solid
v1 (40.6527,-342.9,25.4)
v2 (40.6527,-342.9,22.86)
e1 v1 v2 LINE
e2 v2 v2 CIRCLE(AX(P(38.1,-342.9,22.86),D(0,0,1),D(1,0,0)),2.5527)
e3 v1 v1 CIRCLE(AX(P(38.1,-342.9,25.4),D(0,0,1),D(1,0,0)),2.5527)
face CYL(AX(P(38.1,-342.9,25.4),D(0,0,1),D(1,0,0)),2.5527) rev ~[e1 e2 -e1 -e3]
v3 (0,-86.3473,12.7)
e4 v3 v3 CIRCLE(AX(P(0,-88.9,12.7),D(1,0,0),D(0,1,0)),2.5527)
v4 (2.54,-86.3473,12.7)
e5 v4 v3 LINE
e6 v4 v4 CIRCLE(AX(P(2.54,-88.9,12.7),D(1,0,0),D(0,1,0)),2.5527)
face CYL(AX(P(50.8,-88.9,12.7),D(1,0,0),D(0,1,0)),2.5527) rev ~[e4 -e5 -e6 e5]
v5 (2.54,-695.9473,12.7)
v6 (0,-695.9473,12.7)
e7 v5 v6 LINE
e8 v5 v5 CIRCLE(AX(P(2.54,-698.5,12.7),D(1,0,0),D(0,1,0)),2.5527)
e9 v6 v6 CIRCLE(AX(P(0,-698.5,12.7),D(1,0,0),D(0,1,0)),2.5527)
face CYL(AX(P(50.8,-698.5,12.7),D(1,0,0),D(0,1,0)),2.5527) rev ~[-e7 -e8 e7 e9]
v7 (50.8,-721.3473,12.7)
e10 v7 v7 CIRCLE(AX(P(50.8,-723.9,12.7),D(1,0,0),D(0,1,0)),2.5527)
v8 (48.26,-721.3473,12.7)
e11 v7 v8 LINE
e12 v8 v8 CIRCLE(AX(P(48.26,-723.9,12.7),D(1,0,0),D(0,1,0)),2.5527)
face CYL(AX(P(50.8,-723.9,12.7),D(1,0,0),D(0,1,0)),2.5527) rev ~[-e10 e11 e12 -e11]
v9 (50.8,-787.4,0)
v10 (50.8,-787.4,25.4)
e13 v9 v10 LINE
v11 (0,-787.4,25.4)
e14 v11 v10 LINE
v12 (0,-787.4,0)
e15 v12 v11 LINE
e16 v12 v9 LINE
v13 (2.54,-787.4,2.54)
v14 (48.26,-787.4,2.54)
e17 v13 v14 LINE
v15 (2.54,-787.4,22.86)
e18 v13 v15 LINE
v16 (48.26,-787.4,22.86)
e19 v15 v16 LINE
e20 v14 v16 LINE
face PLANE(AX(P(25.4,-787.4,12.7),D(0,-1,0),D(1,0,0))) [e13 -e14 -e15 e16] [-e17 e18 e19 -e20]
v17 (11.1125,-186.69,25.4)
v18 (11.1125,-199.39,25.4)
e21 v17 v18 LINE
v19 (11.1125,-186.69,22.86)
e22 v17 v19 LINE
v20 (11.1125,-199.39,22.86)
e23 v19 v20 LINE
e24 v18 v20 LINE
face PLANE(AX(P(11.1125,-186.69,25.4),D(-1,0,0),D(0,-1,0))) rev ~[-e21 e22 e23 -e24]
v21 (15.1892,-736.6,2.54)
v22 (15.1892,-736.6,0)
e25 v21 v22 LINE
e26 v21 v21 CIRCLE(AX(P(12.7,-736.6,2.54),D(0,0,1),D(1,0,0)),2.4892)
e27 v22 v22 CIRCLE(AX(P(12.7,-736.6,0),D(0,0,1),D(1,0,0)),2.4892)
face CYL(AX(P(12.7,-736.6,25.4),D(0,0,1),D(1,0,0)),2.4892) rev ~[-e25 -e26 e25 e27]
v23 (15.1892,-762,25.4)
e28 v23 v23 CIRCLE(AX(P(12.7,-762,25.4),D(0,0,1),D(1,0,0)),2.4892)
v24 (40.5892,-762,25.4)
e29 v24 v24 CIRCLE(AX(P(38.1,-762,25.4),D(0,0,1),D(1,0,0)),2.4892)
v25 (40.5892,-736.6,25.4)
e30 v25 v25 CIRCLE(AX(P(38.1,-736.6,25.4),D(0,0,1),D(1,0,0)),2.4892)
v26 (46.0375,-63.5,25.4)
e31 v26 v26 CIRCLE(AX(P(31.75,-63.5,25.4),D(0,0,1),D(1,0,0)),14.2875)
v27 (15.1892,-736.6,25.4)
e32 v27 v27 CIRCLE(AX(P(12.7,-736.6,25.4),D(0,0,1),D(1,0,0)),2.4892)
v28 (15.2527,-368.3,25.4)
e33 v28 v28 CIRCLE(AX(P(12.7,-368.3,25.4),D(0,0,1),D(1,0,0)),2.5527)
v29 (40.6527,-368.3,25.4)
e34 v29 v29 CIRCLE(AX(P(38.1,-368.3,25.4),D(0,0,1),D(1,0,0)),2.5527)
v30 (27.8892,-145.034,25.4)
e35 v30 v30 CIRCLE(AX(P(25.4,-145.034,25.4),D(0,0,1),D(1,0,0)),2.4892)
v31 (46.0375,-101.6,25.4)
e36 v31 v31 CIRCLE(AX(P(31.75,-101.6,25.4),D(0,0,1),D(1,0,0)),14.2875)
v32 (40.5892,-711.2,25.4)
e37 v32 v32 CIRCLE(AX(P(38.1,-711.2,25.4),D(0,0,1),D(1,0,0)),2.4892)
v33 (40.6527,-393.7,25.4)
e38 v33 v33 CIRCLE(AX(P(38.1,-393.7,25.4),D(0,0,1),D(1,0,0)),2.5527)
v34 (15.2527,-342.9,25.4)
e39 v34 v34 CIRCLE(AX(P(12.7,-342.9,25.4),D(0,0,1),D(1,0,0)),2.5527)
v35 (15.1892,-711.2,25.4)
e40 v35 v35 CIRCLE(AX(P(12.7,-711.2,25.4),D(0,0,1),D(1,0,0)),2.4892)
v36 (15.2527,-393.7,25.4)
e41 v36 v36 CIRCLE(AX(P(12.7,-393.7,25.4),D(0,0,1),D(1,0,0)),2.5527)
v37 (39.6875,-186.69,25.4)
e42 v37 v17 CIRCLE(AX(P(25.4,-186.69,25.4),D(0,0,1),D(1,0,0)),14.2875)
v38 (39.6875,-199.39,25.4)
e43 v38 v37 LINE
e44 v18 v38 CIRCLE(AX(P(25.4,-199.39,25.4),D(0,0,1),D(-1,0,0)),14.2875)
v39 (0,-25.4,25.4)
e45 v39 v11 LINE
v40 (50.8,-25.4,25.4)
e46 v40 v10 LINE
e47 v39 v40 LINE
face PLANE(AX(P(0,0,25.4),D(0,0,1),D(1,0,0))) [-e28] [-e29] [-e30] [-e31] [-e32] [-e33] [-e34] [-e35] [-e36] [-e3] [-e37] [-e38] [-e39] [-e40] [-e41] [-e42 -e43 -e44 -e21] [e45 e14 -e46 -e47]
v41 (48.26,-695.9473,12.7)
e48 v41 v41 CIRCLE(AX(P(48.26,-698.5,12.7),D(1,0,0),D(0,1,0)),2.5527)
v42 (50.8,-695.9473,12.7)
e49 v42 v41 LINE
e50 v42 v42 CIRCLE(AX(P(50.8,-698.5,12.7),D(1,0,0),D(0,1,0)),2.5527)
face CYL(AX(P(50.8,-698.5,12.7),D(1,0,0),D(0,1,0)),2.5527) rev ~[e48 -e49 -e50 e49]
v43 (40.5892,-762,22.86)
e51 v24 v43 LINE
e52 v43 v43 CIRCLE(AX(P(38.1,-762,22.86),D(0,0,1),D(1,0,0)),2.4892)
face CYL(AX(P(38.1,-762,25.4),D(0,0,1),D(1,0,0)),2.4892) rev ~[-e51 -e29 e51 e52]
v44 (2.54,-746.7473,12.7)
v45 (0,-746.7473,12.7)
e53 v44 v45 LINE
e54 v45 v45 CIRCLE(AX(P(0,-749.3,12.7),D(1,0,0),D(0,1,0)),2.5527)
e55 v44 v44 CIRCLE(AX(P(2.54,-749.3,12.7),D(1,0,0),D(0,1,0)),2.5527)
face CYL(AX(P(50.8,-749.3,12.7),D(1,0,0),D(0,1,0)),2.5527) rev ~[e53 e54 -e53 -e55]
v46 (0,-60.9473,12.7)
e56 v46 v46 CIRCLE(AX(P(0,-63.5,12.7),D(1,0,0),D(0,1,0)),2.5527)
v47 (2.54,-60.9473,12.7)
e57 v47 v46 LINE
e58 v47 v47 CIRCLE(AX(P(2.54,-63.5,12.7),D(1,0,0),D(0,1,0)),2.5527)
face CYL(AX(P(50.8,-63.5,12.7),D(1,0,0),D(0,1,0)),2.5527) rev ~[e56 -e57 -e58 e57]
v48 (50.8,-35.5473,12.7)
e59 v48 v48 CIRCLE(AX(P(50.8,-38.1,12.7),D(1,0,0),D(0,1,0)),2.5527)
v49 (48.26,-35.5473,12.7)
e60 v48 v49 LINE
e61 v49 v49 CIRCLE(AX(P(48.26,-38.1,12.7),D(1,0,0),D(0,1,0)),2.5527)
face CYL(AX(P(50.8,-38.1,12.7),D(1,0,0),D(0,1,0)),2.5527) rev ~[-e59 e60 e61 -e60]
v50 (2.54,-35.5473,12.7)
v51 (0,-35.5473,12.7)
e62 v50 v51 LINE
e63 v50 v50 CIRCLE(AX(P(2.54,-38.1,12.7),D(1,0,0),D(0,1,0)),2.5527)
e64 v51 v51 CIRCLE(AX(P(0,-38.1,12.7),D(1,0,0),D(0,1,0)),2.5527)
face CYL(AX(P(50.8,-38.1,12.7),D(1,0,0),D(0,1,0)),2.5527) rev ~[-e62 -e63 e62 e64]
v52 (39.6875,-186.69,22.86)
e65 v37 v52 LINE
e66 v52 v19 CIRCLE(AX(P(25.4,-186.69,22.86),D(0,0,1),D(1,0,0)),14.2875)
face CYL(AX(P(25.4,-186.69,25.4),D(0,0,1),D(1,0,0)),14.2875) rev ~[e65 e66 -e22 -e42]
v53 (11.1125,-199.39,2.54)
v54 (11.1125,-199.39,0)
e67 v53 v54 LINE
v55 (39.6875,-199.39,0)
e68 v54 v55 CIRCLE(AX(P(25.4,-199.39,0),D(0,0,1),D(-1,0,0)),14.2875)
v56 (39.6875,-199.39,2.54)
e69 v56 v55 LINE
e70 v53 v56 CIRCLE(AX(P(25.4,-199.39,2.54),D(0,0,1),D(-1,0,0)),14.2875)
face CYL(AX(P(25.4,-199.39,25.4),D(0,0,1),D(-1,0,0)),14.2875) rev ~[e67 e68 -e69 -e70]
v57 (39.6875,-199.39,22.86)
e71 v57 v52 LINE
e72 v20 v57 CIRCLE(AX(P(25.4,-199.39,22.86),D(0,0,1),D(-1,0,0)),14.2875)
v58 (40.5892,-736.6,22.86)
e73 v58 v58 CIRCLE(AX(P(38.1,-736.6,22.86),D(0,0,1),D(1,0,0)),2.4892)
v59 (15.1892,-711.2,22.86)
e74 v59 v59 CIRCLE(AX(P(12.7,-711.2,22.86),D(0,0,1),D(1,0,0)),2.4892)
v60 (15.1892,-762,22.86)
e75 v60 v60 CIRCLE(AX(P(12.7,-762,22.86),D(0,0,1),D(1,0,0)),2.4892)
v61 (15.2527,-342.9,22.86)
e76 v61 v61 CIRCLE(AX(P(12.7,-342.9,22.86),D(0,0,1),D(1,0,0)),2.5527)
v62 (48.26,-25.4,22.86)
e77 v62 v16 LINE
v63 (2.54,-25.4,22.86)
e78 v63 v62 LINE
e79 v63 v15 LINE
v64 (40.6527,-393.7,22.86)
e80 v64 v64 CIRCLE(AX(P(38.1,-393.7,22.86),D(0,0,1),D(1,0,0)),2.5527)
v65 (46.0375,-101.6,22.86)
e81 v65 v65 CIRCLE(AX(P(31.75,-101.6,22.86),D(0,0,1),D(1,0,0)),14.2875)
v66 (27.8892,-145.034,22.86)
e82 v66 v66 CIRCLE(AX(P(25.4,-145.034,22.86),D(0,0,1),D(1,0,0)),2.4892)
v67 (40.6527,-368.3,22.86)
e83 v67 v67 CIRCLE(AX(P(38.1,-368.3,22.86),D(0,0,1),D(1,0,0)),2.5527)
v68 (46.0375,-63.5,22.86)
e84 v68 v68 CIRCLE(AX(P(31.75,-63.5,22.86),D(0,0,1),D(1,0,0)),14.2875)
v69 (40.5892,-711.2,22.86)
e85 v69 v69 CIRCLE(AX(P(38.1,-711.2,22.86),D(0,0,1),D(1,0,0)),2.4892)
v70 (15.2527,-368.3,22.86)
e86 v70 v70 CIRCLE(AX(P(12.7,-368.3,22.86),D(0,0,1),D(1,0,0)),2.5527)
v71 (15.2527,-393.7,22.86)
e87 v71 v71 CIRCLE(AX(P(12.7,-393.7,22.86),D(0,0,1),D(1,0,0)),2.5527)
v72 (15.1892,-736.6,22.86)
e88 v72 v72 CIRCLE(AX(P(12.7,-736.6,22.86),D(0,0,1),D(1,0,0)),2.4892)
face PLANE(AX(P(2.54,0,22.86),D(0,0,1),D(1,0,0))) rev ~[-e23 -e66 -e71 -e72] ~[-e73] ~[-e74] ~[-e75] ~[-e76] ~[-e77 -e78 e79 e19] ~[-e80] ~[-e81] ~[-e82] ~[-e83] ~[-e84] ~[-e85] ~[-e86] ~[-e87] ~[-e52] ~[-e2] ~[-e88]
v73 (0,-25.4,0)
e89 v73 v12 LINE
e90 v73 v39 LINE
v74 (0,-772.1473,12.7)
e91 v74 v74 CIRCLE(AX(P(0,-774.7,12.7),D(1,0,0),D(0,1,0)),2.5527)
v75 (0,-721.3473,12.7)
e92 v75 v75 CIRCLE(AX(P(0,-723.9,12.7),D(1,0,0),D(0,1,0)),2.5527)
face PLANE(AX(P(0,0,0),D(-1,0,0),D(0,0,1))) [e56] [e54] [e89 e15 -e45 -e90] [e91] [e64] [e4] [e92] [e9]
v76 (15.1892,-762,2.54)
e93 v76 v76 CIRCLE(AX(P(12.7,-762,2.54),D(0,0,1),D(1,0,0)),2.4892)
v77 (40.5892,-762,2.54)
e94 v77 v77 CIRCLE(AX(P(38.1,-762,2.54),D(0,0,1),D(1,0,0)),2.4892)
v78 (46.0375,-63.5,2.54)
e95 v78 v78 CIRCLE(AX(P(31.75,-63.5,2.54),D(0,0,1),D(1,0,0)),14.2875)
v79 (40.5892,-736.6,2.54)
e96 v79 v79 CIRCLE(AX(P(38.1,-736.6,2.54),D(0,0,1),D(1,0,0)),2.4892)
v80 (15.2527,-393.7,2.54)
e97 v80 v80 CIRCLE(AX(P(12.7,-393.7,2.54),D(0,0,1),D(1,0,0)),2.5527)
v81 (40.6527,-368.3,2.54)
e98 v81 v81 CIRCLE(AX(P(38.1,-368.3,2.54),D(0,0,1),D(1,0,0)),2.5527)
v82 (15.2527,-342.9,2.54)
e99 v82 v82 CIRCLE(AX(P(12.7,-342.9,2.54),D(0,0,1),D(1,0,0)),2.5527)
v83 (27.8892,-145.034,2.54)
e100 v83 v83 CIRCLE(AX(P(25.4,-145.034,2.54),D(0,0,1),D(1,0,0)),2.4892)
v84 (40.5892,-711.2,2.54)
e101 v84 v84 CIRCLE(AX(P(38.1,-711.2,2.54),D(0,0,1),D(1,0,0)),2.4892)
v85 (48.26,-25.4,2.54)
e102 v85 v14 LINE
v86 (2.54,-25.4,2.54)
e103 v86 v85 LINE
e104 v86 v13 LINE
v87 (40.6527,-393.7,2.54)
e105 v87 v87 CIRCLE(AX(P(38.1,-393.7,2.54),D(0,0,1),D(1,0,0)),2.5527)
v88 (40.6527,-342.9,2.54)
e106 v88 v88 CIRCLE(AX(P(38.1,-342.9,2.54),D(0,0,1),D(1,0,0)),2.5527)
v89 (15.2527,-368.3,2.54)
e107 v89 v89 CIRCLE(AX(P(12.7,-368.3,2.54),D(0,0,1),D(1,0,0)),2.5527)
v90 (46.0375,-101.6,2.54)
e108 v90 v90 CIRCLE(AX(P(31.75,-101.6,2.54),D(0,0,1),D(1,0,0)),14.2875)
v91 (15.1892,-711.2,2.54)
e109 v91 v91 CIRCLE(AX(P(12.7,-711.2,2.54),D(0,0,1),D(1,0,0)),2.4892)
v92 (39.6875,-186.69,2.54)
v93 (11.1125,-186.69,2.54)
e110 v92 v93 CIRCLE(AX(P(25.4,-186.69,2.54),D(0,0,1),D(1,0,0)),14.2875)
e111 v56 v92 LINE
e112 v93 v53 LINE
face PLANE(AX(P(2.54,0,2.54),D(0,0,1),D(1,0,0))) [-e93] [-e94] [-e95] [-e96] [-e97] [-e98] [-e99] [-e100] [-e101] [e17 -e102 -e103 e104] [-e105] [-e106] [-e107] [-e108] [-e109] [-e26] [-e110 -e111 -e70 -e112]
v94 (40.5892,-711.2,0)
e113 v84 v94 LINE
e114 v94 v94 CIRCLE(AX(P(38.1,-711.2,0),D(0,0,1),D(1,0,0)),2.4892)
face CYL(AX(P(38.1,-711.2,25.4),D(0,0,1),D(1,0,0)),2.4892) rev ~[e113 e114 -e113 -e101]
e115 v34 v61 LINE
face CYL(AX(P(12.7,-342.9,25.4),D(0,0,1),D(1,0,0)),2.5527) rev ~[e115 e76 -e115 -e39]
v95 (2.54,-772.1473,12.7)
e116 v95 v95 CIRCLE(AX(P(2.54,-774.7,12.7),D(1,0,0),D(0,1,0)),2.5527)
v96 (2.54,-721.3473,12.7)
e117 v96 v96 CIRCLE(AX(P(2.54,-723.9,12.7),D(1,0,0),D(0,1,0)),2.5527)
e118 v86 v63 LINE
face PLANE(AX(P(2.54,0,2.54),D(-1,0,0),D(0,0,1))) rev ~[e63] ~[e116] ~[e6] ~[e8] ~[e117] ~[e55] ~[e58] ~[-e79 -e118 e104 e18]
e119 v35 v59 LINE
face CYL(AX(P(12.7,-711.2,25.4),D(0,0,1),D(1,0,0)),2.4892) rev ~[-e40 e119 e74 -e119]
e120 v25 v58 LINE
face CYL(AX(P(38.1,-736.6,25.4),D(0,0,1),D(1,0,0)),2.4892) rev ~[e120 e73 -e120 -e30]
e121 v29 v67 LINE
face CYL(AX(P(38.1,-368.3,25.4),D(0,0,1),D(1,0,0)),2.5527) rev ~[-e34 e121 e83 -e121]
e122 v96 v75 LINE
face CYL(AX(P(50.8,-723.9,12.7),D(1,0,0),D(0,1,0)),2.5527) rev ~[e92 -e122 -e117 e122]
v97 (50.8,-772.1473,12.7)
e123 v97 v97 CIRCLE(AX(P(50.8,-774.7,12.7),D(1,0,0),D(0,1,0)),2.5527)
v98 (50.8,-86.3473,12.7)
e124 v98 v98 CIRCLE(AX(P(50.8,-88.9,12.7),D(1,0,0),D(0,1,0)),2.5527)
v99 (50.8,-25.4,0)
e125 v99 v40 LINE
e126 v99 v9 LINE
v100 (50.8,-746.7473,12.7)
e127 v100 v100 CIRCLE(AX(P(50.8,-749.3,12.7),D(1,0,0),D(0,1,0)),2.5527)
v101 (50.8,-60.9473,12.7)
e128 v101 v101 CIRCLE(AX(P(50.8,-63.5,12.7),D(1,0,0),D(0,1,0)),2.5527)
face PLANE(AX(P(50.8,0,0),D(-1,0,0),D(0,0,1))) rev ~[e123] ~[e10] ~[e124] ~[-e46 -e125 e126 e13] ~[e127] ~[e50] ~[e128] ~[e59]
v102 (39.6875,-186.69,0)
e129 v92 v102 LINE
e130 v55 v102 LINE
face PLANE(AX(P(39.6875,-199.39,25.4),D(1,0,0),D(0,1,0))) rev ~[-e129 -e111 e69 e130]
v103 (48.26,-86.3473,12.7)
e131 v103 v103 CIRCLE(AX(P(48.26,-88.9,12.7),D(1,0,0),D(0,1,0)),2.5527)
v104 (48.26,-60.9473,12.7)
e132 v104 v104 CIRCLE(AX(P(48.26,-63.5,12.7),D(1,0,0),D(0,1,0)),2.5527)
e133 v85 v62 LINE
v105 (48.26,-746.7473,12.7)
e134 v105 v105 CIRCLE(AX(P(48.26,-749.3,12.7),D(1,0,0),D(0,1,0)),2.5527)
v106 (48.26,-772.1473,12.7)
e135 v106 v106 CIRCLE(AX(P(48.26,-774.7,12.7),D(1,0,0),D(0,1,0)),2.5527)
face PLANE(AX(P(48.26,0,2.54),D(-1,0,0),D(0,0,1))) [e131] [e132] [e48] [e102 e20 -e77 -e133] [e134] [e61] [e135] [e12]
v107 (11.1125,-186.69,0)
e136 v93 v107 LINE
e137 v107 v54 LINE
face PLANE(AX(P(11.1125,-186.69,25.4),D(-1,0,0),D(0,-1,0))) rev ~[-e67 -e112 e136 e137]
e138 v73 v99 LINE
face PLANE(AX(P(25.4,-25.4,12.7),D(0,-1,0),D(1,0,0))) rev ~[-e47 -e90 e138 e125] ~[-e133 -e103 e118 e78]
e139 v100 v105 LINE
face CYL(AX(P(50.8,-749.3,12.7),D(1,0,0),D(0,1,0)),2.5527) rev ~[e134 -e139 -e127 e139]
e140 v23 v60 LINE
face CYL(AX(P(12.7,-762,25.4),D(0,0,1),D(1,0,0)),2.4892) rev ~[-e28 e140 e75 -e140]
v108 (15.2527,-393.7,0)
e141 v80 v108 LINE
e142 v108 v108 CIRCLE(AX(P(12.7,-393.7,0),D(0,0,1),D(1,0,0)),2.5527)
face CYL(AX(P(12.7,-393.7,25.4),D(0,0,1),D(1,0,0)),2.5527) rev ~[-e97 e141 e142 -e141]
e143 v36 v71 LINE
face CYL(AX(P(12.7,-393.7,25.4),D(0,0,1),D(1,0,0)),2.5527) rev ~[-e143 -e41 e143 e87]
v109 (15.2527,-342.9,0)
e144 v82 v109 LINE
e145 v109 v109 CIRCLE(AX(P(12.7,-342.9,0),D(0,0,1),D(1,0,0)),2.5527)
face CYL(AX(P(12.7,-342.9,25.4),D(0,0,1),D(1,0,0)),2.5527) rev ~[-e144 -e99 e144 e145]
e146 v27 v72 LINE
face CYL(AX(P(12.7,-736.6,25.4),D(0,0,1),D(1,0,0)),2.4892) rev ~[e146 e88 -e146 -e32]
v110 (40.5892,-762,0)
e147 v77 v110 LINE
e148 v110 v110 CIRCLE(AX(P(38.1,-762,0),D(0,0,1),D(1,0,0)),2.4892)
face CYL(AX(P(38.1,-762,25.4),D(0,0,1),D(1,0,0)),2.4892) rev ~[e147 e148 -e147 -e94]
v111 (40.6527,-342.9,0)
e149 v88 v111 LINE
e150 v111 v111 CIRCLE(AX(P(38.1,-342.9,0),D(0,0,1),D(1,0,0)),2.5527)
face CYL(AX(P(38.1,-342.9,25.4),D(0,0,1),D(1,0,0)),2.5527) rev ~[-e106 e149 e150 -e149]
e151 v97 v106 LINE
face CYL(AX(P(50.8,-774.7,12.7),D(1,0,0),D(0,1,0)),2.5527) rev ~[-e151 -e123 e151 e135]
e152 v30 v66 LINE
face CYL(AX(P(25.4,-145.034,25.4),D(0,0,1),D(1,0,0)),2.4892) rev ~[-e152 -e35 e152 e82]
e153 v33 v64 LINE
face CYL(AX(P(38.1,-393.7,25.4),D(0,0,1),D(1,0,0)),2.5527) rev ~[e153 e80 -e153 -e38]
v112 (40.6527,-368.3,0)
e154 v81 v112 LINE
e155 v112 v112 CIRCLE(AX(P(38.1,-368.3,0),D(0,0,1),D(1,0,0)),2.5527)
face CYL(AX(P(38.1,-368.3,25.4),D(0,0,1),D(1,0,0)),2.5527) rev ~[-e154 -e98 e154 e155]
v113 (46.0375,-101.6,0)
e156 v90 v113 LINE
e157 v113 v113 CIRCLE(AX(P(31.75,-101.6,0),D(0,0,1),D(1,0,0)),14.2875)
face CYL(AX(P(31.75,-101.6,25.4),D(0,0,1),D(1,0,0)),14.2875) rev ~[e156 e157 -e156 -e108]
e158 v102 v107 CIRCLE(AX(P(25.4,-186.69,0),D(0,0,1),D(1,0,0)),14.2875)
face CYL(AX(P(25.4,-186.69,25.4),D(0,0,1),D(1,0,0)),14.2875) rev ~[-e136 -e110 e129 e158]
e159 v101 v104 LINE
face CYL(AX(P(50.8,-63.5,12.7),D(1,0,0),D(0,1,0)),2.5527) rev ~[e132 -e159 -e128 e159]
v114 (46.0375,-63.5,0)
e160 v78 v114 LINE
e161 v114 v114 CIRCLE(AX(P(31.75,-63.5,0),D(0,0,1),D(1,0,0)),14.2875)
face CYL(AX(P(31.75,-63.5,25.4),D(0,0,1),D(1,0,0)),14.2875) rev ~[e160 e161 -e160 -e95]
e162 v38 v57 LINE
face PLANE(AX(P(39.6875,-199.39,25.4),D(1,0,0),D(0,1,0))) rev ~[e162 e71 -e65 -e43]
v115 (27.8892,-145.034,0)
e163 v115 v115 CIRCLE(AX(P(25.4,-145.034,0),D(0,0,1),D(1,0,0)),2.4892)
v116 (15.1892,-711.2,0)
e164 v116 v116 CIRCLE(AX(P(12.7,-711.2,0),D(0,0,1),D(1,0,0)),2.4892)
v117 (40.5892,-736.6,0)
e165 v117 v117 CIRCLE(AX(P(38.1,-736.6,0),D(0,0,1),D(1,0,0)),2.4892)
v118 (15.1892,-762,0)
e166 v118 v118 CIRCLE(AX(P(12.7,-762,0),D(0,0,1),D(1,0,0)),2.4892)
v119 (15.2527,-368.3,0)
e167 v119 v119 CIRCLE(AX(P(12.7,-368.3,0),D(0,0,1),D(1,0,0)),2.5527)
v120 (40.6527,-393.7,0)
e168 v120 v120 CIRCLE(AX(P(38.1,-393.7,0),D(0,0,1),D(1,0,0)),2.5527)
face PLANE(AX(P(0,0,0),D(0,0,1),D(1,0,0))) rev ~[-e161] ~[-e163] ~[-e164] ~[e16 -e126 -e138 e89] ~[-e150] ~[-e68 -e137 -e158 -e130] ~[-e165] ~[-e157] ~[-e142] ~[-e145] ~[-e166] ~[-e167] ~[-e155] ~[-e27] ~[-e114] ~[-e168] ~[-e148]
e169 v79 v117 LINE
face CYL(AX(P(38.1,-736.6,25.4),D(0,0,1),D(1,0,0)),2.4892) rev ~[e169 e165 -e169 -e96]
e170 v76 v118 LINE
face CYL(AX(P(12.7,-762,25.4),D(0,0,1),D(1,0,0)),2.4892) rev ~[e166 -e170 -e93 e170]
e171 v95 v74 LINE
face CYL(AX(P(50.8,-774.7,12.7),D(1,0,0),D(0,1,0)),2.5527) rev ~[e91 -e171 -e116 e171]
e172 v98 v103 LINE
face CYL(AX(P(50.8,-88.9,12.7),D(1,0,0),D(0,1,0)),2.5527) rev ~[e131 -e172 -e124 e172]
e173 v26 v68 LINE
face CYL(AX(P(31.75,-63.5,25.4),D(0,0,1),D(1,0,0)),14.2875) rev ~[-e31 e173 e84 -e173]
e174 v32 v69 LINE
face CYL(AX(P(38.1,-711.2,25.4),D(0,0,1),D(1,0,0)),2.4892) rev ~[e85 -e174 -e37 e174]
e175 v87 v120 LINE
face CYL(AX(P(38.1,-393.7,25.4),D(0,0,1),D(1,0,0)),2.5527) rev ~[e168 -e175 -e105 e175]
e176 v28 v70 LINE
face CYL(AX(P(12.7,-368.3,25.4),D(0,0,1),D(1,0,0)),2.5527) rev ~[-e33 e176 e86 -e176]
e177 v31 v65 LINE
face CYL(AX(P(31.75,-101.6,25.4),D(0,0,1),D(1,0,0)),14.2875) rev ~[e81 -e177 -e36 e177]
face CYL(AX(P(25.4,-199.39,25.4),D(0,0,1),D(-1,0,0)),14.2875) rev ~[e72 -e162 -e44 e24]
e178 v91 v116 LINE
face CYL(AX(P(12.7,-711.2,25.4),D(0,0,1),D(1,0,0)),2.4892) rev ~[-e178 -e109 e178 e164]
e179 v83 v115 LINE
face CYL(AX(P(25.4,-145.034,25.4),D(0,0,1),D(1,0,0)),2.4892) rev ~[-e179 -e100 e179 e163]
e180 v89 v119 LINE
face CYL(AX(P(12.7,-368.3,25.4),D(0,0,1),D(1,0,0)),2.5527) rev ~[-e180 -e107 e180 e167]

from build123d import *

# Parameters (mm, degrees)
F0_W     = 50.8
F0_H     = 25.4
F0_W_2   = 45.72
F0_H_2   = 20.32
F1_DEPTH = 787.4
F3_R     = 14.2875
F3_R_2   = 2.4892
F3_R_3   = 2.5527
F4_DEPTH = 25.4
F2_R     = 2.5527
F5_DEPTH = 50.801
F6_DEPTH = 25.4


# Not quite as in the source:
# - a feature names something its author has since deleted; it is built from what else it names


with BuildPart() as f1:
    # F0 (on Front) → F1 (new body)
    with BuildSketch(Plane.XZ):
        with Locations((25.4, 12.7)):
            Rectangle(F0_W, F0_H)
        with Locations((25.4, 12.7)):
            Rectangle(F0_W_2, F0_H_2, mode=Mode.SUBTRACT)
    extrude(amount=F1_DEPTH)

    # F3 (on face) → F4 (cut)
    with BuildSketch(Plane.XY.offset(25.4)):
        with Locations((31.75, -63.5)):
            Circle(F3_R)
        with BuildLine():
            ThreePointArc((38.1988341754, -193.04), (39.3103558461, -189.9510821033), (39.6875, -186.69))
            ThreePointArc((39.6875, -186.69), (25.4, -172.4025), (11.1125, -186.69))
            ThreePointArc((11.1125, -186.69), (11.4896441539, -189.9510821033), (12.6011658246, -193.04))
            ThreePointArc((12.6011658246, -193.04), (25.4, -185.1025), (38.1988341754, -193.04))
        make_face()
        with BuildLine():
            Line((39.6875, -199.39), (39.6875, -186.69))
            ThreePointArc((39.6875, -186.69), (39.3103558461, -189.9510821033), (38.1988341754, -193.04))
            ThreePointArc((38.1988341754, -193.04), (39.3103558461, -196.1289178967), (39.6875, -199.39))
        make_face()
        with BuildLine():
            ThreePointArc((12.6011658246, -193.04), (11.4896441539, -189.9510821033), (11.1125, -186.69))
            Line((11.1125, -186.69), (11.1125, -199.39))
            ThreePointArc((11.1125, -199.39), (11.4896441539, -196.1289178967), (12.6011658246, -193.04))
        make_face()
        with BuildLine():
            ThreePointArc((39.6875, -199.39), (39.3103558461, -196.1289178967), (38.1988341754, -193.04))
            ThreePointArc((38.1988341754, -193.04), (25.4, -200.9775), (12.6011658246, -193.04))
            ThreePointArc((12.6011658246, -193.04), (11.4896441539, -196.1289178967), (11.1125, -199.39))
            ThreePointArc((11.1125, -199.39), (25.4, -213.6775), (39.6875, -199.39))
        make_face()
        with BuildLine():
            ThreePointArc((12.6011658246, -193.04), (25.4, -200.9775), (38.1988341754, -193.04))
            ThreePointArc((38.1988341754, -193.04), (25.4, -185.1025), (12.6011658246, -193.04))
        make_face()
        with Locations((12.7, -736.6)):
            Circle(F3_R_2)
        with Locations((12.7, -711.2)):
            Circle(F3_R_2)
        with Locations((38.1, -736.6)):
            Circle(F3_R_2)
        with Locations((38.1, -711.2)):
            Circle(F3_R_2)
        with Locations((12.7, -342.9)):
            Circle(F3_R_3)
        with Locations((12.7, -368.3)):
            Circle(F3_R_3)
        with Locations((12.7, -393.7)):
            Circle(F3_R_3)
        with Locations((38.1, -342.9)):
            Circle(F3_R_3)
        with Locations((38.1, -368.3)):
            Circle(F3_R_3)
        with Locations((38.1, -393.7)):
            Circle(F3_R_3)
        with Locations((25.4, -145.034)):
            Circle(F3_R_2)
        with Locations((38.1, -762)):
            Circle(F3_R_2)
        with Locations((12.7, -762)):
            Circle(F3_R_2)
        with Locations((31.75, -101.6)):
            Circle(F3_R)
    extrude(amount=-F4_DEPTH, mode=Mode.SUBTRACT)

    # F2 (on face) → F5 (cut, through all)
    with BuildSketch(Plane.YZ.offset(50.8)):
        with Locations((-12.7, 12.7)):
            Circle(F2_R)
        with Locations((-38.1, 12.7)):
            Circle(F2_R)
        with Locations((-63.5, 12.7)):
            Circle(F2_R)
        with Locations((-88.9, 12.7)):
            Circle(F2_R)
        with Locations((-774.7, 12.7)):
            Circle(F2_R)
        with Locations((-749.3, 12.7)):
            Circle(F2_R)
        with Locations((-723.9, 12.7)):
            Circle(F2_R)
        with Locations((-698.5, 12.7)):
            Circle(F2_R)
    extrude(amount=-F5_DEPTH, mode=Mode.SUBTRACT)

    # F0 (on Front) → F6 (cut)
    with BuildSketch(Plane.XZ):
        with Locations((25.4, 12.7)):
            Rectangle(F0_W, F0_H)
        with Locations((25.4, 12.7)):
            Rectangle(F0_W_2, F0_H_2, mode=Mode.SUBTRACT)
    extrude(amount=F6_DEPTH, mode=Mode.SUBTRACT)


solid = f1.part
